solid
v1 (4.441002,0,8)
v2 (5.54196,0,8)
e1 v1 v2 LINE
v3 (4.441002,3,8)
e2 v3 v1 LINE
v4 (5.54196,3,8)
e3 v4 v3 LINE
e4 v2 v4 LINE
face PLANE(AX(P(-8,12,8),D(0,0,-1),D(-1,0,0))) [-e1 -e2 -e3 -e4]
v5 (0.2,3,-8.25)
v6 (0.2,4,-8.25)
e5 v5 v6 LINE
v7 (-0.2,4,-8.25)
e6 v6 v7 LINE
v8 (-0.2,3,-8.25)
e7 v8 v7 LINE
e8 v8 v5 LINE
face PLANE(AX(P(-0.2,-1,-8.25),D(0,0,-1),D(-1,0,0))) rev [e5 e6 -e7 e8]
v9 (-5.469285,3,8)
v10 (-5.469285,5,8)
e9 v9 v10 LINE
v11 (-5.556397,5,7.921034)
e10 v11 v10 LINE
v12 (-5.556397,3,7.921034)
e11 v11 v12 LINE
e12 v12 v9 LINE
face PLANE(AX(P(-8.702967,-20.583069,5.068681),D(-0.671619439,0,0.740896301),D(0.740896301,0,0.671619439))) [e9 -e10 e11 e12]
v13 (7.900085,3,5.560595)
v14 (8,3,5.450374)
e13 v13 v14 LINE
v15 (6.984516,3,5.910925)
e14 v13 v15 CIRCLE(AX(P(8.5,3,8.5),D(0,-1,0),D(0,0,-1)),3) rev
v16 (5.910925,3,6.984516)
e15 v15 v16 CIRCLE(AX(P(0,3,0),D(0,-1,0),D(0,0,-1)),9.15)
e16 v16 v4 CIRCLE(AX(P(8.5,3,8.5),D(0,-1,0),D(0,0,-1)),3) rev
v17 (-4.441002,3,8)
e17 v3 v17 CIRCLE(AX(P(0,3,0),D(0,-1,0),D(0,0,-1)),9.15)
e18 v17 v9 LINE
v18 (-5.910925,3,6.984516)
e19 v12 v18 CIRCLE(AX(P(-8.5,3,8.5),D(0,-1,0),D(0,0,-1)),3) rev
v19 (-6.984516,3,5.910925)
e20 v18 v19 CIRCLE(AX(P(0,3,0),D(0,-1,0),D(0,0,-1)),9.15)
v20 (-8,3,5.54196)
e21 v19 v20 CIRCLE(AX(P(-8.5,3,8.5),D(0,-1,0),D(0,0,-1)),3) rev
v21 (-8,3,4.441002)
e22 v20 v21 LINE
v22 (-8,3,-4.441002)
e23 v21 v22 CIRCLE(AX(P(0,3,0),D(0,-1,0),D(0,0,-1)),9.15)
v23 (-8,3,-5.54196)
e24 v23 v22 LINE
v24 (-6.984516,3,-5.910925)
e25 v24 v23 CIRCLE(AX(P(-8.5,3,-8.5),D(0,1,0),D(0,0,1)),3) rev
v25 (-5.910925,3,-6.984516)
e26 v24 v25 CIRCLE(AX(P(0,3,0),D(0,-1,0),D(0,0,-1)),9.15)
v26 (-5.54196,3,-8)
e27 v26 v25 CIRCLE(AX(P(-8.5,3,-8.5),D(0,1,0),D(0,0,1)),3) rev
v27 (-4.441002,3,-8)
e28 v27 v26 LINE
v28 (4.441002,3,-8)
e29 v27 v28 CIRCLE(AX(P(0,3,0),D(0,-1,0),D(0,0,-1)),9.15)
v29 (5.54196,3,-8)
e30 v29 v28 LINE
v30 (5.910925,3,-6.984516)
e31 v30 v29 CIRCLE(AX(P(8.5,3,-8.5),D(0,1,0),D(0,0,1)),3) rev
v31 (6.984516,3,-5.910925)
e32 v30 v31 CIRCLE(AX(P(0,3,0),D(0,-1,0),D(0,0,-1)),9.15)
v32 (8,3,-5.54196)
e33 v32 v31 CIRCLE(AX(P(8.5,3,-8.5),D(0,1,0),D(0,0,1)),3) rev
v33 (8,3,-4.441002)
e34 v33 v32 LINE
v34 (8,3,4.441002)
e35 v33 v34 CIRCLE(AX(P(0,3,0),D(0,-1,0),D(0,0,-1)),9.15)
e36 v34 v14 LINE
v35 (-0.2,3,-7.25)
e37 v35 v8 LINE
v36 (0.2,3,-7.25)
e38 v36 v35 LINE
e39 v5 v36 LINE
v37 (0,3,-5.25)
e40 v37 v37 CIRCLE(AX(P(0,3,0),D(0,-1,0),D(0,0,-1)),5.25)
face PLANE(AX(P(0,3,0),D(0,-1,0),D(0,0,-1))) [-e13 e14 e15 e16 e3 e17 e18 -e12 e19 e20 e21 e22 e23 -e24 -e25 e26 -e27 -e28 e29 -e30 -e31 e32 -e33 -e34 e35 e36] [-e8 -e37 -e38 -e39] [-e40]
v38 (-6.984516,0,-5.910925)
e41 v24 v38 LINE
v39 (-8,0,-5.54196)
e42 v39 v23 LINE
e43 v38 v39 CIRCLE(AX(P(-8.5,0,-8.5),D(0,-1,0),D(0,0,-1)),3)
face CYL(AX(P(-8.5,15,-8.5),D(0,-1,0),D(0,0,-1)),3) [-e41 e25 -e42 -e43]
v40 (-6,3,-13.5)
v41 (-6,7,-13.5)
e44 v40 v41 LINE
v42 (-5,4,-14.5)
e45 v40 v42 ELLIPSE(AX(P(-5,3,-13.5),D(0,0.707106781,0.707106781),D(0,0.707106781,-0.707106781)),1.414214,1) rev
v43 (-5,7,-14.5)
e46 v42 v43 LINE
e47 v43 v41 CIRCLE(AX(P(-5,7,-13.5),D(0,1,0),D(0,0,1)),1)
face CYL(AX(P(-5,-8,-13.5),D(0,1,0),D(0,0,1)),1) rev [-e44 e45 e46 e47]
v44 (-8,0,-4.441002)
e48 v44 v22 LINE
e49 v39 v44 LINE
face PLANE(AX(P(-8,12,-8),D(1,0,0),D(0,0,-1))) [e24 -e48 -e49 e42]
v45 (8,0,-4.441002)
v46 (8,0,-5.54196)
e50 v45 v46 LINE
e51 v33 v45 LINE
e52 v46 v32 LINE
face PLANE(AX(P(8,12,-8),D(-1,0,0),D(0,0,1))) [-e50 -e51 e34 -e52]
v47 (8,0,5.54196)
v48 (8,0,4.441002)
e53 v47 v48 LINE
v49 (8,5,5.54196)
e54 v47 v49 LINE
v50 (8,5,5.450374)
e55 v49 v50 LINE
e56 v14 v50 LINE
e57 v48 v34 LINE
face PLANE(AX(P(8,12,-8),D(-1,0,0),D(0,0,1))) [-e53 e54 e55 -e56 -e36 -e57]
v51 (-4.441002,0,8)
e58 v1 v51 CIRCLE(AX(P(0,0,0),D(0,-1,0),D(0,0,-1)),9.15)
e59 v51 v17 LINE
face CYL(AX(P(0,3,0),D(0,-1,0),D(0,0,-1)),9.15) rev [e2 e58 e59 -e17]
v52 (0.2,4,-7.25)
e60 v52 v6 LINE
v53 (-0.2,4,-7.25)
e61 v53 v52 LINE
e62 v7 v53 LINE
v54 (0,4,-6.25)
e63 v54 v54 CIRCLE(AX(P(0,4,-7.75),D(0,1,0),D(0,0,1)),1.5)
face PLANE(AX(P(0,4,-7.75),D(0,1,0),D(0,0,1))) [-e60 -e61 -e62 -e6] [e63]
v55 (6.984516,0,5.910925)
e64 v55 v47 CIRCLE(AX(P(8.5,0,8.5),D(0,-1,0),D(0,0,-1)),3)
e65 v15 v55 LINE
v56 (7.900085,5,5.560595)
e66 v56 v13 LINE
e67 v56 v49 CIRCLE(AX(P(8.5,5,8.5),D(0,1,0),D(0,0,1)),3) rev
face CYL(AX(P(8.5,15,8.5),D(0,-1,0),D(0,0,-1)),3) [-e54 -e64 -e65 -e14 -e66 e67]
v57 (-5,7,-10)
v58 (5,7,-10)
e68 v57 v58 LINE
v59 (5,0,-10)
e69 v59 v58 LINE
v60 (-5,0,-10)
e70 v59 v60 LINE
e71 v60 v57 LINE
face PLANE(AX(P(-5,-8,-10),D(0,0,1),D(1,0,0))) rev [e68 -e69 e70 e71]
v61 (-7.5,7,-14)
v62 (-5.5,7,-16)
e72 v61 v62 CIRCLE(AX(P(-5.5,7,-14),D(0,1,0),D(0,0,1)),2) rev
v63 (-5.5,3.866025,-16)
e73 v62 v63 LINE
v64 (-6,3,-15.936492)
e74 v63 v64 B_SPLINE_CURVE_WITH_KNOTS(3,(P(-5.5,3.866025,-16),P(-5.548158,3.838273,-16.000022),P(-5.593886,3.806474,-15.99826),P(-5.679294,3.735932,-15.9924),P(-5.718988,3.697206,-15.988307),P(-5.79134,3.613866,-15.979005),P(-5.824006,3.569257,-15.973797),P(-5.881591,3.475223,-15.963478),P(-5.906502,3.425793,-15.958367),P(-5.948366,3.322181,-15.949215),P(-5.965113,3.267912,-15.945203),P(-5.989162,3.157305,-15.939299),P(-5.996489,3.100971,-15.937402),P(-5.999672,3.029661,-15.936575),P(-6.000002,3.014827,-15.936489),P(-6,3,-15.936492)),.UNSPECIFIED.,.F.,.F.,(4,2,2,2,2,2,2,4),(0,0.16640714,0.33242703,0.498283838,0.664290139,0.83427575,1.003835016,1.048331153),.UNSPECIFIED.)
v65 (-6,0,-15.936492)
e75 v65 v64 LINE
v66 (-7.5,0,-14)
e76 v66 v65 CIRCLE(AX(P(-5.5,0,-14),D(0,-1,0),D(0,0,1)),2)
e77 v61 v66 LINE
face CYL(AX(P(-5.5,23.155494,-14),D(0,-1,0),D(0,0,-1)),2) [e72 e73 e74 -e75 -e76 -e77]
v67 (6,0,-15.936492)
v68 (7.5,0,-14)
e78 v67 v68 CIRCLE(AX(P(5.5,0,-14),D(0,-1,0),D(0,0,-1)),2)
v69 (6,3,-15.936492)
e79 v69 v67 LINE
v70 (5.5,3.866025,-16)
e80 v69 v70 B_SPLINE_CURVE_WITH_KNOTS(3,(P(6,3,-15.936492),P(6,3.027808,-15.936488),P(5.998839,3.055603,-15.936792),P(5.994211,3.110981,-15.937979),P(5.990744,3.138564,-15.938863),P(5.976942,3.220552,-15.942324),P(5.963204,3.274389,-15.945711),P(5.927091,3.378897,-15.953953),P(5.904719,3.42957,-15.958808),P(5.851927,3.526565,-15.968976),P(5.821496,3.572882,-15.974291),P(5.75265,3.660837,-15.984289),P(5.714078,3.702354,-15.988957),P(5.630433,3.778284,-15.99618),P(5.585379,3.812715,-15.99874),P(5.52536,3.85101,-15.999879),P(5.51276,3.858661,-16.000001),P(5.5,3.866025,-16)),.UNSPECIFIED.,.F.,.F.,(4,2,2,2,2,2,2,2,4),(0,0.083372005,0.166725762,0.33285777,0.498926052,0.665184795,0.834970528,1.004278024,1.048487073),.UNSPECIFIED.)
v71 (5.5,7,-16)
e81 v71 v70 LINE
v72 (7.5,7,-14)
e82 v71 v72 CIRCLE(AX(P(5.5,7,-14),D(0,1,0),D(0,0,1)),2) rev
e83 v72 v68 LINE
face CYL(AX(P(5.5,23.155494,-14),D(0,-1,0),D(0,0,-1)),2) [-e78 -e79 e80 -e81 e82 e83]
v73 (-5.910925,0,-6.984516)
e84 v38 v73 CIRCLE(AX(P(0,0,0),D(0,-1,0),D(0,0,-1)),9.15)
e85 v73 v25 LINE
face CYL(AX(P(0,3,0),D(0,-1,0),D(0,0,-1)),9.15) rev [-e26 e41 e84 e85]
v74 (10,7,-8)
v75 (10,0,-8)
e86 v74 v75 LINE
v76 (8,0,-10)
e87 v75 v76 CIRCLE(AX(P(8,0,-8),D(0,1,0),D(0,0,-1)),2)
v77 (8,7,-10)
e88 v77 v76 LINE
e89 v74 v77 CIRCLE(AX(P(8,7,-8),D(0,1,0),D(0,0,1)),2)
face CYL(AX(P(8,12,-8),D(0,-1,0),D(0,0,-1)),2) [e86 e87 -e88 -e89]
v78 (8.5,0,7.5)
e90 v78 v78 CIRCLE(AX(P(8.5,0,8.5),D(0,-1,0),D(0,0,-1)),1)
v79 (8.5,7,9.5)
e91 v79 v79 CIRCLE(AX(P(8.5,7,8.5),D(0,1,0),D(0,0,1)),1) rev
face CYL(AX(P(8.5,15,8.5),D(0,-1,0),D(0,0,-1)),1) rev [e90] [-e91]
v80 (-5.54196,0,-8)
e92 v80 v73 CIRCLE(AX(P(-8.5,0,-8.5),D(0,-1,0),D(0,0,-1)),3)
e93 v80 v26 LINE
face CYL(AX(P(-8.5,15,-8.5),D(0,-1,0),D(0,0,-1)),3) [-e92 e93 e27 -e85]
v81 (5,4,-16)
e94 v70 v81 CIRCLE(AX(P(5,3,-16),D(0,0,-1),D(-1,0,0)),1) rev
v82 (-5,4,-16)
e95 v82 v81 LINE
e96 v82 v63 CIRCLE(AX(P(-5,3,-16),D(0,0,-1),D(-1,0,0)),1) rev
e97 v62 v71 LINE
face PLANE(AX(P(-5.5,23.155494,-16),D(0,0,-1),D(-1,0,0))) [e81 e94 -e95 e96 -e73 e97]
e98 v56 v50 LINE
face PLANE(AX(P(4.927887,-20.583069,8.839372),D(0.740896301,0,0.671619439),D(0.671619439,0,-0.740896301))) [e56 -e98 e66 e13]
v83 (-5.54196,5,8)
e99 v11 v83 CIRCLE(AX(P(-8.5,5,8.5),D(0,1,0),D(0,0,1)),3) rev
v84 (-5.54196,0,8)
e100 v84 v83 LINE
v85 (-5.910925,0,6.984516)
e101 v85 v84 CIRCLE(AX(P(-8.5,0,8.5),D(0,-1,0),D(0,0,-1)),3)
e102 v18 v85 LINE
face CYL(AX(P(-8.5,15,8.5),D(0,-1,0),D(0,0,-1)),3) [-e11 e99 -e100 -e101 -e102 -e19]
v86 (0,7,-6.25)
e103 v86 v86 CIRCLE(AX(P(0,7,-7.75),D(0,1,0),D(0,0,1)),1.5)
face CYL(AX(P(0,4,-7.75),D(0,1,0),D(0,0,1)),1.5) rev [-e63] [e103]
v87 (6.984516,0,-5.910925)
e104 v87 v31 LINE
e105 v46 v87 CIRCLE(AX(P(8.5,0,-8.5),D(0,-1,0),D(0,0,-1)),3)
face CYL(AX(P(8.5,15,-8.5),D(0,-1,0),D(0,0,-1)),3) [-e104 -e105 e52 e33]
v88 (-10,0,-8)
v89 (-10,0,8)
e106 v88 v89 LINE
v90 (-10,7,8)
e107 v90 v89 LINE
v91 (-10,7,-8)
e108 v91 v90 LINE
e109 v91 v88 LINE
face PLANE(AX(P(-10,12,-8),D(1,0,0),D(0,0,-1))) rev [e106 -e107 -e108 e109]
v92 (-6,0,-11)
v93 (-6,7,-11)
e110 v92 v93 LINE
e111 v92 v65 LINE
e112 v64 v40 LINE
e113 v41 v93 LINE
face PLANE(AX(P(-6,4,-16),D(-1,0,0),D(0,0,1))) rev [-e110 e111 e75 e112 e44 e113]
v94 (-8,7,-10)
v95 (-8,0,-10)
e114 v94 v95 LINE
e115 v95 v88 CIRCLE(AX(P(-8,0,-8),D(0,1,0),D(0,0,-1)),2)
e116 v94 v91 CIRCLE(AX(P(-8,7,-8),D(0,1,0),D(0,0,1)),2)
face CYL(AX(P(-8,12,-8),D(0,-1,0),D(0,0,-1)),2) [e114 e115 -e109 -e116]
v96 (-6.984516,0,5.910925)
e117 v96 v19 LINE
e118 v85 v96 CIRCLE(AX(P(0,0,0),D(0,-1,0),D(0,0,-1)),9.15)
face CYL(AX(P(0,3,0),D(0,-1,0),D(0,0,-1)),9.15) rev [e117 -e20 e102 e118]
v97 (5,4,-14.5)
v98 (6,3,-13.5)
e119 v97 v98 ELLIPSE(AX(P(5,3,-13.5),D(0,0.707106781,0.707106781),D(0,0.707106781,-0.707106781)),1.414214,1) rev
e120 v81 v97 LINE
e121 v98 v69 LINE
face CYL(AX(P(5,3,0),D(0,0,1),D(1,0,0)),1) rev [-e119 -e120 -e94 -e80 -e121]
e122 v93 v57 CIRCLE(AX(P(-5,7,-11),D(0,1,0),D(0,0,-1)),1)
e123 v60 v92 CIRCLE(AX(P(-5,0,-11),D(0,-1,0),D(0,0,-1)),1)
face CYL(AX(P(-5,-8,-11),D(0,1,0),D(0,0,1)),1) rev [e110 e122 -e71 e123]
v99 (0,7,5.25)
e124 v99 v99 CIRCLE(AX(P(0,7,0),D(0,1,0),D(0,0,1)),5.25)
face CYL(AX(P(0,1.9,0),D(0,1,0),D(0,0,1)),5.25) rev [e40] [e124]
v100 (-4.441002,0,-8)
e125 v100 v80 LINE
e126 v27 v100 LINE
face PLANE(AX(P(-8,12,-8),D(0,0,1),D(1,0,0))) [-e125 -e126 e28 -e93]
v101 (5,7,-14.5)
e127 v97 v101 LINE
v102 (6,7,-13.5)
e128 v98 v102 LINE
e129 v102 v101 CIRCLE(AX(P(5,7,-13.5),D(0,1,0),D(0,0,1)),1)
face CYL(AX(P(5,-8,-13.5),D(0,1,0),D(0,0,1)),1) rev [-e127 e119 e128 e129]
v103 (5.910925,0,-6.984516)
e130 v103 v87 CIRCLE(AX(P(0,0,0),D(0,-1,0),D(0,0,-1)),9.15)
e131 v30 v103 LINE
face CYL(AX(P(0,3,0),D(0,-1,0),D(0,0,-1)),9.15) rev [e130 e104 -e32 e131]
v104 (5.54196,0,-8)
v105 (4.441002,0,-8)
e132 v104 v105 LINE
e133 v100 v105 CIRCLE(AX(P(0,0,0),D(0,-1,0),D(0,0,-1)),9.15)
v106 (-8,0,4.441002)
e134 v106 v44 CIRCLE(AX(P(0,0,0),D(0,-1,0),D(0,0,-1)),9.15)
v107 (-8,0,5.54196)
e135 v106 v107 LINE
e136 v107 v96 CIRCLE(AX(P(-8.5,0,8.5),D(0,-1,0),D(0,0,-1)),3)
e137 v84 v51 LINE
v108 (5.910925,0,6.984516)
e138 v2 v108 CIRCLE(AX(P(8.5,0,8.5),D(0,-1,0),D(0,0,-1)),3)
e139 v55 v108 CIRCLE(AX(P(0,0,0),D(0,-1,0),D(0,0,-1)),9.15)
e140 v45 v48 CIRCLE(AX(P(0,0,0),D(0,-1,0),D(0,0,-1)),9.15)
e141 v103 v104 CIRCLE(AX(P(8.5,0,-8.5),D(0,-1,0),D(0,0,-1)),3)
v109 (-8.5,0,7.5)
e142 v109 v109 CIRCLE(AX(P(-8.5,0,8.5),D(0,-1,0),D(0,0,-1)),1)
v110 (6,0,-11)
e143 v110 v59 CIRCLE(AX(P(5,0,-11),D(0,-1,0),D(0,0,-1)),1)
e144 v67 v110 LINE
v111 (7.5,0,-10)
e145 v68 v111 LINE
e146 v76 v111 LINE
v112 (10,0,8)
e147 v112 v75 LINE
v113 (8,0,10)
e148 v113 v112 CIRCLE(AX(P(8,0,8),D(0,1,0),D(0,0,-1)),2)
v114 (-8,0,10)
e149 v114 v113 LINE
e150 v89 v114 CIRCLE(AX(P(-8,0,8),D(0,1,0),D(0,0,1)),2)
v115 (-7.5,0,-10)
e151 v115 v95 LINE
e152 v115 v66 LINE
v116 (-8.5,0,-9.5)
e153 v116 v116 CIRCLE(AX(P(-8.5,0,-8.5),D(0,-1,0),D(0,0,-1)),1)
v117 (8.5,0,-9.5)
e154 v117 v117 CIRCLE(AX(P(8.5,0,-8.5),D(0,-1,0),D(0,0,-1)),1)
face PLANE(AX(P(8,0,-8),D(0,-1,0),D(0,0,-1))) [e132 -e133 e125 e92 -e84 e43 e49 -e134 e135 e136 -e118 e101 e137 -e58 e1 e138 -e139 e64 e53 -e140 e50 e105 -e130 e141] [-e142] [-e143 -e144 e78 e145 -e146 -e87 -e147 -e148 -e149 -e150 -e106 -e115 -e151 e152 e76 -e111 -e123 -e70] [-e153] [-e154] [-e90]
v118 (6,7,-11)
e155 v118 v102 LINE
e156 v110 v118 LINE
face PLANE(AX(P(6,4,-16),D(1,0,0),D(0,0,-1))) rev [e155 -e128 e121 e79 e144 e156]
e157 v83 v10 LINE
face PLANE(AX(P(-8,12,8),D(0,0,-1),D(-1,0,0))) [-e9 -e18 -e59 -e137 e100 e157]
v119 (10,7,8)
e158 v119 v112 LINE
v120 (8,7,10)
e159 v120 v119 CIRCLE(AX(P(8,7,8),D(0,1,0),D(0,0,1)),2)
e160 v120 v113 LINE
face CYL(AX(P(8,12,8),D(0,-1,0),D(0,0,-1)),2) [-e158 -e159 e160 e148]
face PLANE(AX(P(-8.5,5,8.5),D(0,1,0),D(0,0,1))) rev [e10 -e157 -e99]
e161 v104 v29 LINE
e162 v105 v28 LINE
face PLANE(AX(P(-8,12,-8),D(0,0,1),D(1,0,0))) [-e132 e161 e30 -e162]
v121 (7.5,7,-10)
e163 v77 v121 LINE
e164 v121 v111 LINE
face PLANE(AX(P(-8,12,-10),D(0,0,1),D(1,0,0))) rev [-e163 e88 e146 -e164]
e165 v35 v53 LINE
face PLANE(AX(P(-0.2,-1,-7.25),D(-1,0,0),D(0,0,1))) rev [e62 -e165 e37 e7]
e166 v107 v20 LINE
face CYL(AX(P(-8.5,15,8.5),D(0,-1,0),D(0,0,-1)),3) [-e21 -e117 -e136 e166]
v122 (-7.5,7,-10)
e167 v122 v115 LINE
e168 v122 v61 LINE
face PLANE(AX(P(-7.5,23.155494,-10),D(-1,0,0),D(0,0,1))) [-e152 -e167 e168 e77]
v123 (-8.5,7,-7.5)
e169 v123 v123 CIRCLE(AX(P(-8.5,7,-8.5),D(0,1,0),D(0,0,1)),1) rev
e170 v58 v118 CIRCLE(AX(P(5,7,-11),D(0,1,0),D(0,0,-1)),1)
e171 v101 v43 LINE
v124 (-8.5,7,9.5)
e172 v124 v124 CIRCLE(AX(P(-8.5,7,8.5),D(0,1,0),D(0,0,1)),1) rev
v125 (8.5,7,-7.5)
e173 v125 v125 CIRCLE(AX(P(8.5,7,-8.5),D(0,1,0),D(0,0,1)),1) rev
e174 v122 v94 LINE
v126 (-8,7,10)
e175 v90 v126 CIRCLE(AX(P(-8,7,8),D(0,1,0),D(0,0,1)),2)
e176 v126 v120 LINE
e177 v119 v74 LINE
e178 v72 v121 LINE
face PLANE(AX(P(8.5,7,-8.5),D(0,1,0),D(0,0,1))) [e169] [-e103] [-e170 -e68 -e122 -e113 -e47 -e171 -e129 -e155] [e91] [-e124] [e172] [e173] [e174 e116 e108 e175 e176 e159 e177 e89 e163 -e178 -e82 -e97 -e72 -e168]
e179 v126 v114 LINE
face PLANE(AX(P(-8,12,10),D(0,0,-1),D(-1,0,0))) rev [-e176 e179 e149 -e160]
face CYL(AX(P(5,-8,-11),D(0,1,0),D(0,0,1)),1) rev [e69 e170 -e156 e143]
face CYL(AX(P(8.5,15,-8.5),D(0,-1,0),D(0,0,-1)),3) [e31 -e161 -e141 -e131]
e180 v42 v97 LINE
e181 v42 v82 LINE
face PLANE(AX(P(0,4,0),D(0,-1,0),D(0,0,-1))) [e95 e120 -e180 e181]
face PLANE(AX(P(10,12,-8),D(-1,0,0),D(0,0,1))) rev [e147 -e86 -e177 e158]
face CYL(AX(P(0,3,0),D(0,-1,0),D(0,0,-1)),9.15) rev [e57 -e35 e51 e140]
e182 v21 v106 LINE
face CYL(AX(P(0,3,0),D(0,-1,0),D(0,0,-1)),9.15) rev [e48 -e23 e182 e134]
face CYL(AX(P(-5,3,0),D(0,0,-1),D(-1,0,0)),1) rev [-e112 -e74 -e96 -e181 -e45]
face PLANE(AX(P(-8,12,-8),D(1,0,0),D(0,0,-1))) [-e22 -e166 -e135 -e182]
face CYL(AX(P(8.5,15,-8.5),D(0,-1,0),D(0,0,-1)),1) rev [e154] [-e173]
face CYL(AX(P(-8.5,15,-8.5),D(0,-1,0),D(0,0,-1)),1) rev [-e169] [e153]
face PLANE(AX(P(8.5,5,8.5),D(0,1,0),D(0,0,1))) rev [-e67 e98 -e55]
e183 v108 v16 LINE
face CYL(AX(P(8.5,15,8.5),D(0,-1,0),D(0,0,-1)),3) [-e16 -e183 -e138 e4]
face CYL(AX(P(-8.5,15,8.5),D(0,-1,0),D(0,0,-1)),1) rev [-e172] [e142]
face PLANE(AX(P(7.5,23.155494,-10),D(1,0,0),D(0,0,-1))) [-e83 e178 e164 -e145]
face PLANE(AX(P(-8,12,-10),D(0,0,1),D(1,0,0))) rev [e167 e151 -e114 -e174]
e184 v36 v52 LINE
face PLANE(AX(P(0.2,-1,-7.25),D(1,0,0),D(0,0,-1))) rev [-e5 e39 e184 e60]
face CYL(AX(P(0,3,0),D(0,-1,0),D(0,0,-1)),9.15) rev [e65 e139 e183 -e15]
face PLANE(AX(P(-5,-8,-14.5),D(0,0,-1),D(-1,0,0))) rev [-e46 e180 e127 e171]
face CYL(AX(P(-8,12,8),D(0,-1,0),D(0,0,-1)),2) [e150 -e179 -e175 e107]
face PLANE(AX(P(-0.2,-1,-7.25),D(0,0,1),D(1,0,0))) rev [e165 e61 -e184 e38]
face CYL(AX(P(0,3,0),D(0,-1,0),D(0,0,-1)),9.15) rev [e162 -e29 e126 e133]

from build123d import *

# Parameters (mm, degrees)
BOSS_EXTRUDE1_DEPTH = 12
SKETCH2_R           = 1
CUT_EXTRUDE1_DEPTH  = 15
SKETCH4_R           = 2.25
CUT_EXTRUDE3_DEPTH  = 5
SHELL1_DEPTH        = 10
SHELL1_2_DEPTH      = 5
SKETCH3_R           = 9.15
CUT_EXTRUDE2_DEPTH  = 3
FILLET1_R           = 2
BOSS_EXTRUDE2_DEPTH = 7
SKETCH7_W           = 12
SKETCH7_H           = 4.549017994
CUT_EXTRUDE4_DEPTH  = 4
SKETCH8_W           = 27.297760414
SKETCH8_H           = 10.352522689
CUT_EXTRUDE5_DEPTH  = 33
BOSS_EXTRUDE8_DEPTH = 4
SKETCH11_R          = 5.5
CUT_EXTRUDE6_DEPTH  = 4
SKETCH12_R          = 1.5
CUT_EXTRUDE7_DEPTH  = 3
SKETCH13_W          = 0.4
SKETCH13_H          = 1
CUT_EXTRUDE8_DEPTH  = 5
CUT_EXTRUDE9_DEPTH  = 15
FILLET2_R           = 1
BOSS_EXTRUDE9_DEPTH = 4
SKETCH16_R          = 5.25
CUT_EXTRUDE10_DEPTH = 5.1


# Read off the part's stored shape, not the designer's step: Shell1
with BuildPart() as part:
    # Sketch1 → Boss-Extrude1 (new body)
    with BuildSketch(Plane(origin=(0, 0, 0), x_dir=(1, 0, 0), z_dir=(0, 1, 0))):
        with BuildLine():
            Line((-8, 10), (8, 10))
            ThreePointArc((8, 10), (9.414213562, 9.414213562), (10, 8))
            Line((10, 8), (10, -8))
            ThreePointArc((10, -8), (9.414213562, -9.414213562), (8, -10))
            Line((8, -10), (-8, -10))
            ThreePointArc((-8, -10), (-9.414213562, -9.414213562), (-10, -8))
            Line((-10, -8), (-10, 8))
            ThreePointArc((-10, 8), (-9.414213562, 9.414213562), (-8, 10))
        make_face()
    extrude(amount=BOSS_EXTRUDE1_DEPTH)

    # Sketch2 → Cut-Extrude1 (cut)
    with BuildSketch(Plane.XZ):
        with Locations(Location((-8.5, 8.5, 0), (0, 0, 270))):
            Circle(SKETCH2_R)
        with Locations(Location((8.5, 8.5, 0), (0, 0, 270))):
            Circle(SKETCH2_R)
        with Locations(Location((8.5, -8.5, 0), (0, 0, 270))):
            Circle(SKETCH2_R)
        with Locations(Location((-8.5, -8.5, 0), (0, 0, 270))):
            Circle(SKETCH2_R)
    extrude(amount=-CUT_EXTRUDE1_DEPTH, mode=Mode.SUBTRACT)

    # Sketch4 → Cut-Extrude3 (cut)
    with BuildSketch(Plane(origin=(0, 12, 0), x_dir=(1, 0, 0), z_dir=(0, 1, 0))):
        with Locations((8.5, -8.5)):
            Circle(SKETCH4_R)
        with Locations((-8.5, -8.5)):
            Circle(SKETCH4_R)
        with Locations((-8.5, 8.5)):
            Circle(SKETCH4_R)
        with Locations((8.5, 8.5)):
            Circle(SKETCH4_R)
    extrude(amount=-CUT_EXTRUDE3_DEPTH, mode=Mode.SUBTRACT)

    # Shell1 outline → Shell1 (cut)
    with BuildSketch(Plane(origin=(0, 0, 0), x_dir=(1, 0, 0), z_dir=(0, 1, 0))):
        with BuildLine():
            Line((-4.279514246, -8), (4.279514246, -8))
            ThreePointArc((4.279514246, -8), (5.49479618, -5.49479618), (8, -4.279514246))
            Line((8, -4.279514246), (8, 4.279514246))
            ThreePointArc((8, 4.279514246), (5.49479618, 5.49479618), (4.279514246, 8))
            Line((4.279514246, 8), (-4.279514246, 8))
            ThreePointArc((-4.279514246, 8), (-5.49479618, 5.49479618), (-8, 4.279514246))
            Line((-8, 4.279514246), (-8, -4.279514246))
            ThreePointArc((-8, -4.279514246), (-5.49479618, -5.49479618), (-4.279514246, -8))
        make_face()
    extrude(amount=SHELL1_DEPTH, mode=Mode.SUBTRACT)

    # Shell1 2 outline → Shell1 2 (cut)
    with BuildSketch(Plane(origin=(0, 0, 0), x_dir=(1, 0, 0), z_dir=(0, 1, 0))):
        with BuildLine():
            Line((4.279514246, -8), (5.541960108, -8))
            ThreePointArc((5.541960108, -8), (6.378679656, -6.378679656), (8, -5.541960108))
            Line((8, -5.541960108), (8, -4.279514246))
            ThreePointArc((8, -4.279514246), (5.49479618, -5.49479618), (4.279514246, -8))
        make_face()
        with BuildLine():
            Line((-5.541960108, -8), (-4.279514246, -8))
            ThreePointArc((-4.279514246, -8), (-5.49479618, -5.49479618), (-8, -4.279514246))
            Line((-8, -4.279514246), (-8, -5.541960108))
            ThreePointArc((-8, -5.541960108), (-6.378679656, -6.378679656), (-5.541960108, -8))
        make_face()
        with BuildLine():
            ThreePointArc((4.279514246, 8), (5.49479618, 5.49479618), (8, 4.279514246))
            Line((8, 4.279514246), (8, 5.541960108))
            ThreePointArc((8, 5.541960108), (6.378679656, 6.378679656), (5.541960108, 8))
            Line((5.541960108, 8), (4.279514246, 8))
        make_face()
        with BuildLine():
            Line((-8, 5.541960108), (-8, 4.279514246))
            ThreePointArc((-8, 4.279514246), (-5.49479618, 5.49479618), (-4.279514246, 8))
            Line((-4.279514246, 8), (-5.541960108, 8))
            ThreePointArc((-5.541960108, 8), (-6.378679656, 6.378679656), (-8, 5.541960108))
        make_face()
    extrude(amount=SHELL1_2_DEPTH, mode=Mode.SUBTRACT)

    # Sketch3 → Cut-Extrude2 (cut)
    with BuildSketch(Plane.XZ):
        Circle(SKETCH3_R)
    extrude(amount=-CUT_EXTRUDE2_DEPTH, mode=Mode.SUBTRACT)

    # Fillet1
    fillet1_edges = [part.edges().sort_by_distance(p)[0] for p in [
        (6.822949017, 9.5, -10),
        (10, 9.5, -6.822949017),
        (-6.822949017, 9.5, -10),
        (-10, 9.5, -6.822949017),
        (-10, 9.5, 6.822949017),
        (-6.822949017, 9.5, 10),
        (6.822949017, 9.5, 10),
        (10, 9.5, 6.822949017),
    ]]
    fillet(fillet1_edges, radius=FILLET1_R)

    # Sketch6 → Boss-Extrude2 (add)
    with BuildSketch(Plane.XZ):
        with BuildLine():
            Line((-7.5, -10), (7.5, -10))
            Line((7.5, -10), (7.5, -14))
            ThreePointArc((7.5, -14), (6.914213562, -15.414213562), (5.5, -16))
            Line((5.5, -16), (-5.5, -16))
            ThreePointArc((-5.5, -16), (-6.914213562, -15.414213562), (-7.5, -14))
            Line((-7.5, -14), (-7.5, -10))
        make_face()
    extrude(amount=-BOSS_EXTRUDE2_DEPTH)

    # Sketch7 → Cut-Extrude4 (cut)
    with BuildSketch(Plane.XZ):
        with Locations((0, -13.725491003)):
            Rectangle(SKETCH7_W, SKETCH7_H)
    extrude(amount=-CUT_EXTRUDE4_DEPTH, mode=Mode.SUBTRACT)

    # Sketch8 → Cut-Extrude5 (cut)
    with BuildSketch(Plane(origin=(10, 0, 0), x_dir=(0, 0, -1), z_dir=(1, 0, 0))):
        with Locations((3.648880207, 12.176261345)):
            Rectangle(SKETCH8_W, SKETCH8_H)
    extrude(amount=-CUT_EXTRUDE5_DEPTH, mode=Mode.SUBTRACT)

    # Sketch10 → Boss-Extrude8 (add)
    with BuildSketch(Plane(origin=(0, 7, 0), x_dir=(1, 0, 0), z_dir=(0, 1, 0))):
        Polygon((9.294915126, 4.441002139), (-9.072540785, 4.441002139), (-5.843708737, 9.485613806), (6.066083078, 9.485613806), align=None)
    extrude(amount=-BOSS_EXTRUDE8_DEPTH)

    # Sketch11 → Cut-Extrude6 (cut)
    with BuildSketch(Plane.XZ.offset(-3)):
        Circle(SKETCH11_R)
    extrude(amount=-CUT_EXTRUDE6_DEPTH, mode=Mode.SUBTRACT)

    # Sketch12 → Cut-Extrude7 (cut)
    with BuildSketch(Plane(origin=(0, 7, 0), x_dir=(1, 0, 0), z_dir=(0, 1, 0))):
        with Locations(Location((0, 7.75, 0), (0, 0, 270))):
            Circle(SKETCH12_R)
    extrude(amount=-CUT_EXTRUDE7_DEPTH, mode=Mode.SUBTRACT)

    # Sketch13 → Cut-Extrude8 (cut)
    with BuildSketch(Plane(origin=(0, 4, 0), x_dir=(1, 0, 0), z_dir=(0, 1, 0))):
        with Locations((0, 7.75)):
            Rectangle(SKETCH13_W, SKETCH13_H)
    extrude(amount=-CUT_EXTRUDE8_DEPTH, mode=Mode.SUBTRACT)

    # Sketch14 → Cut-Extrude9 (cut)
    with BuildSketch(Plane(origin=(0, 7, 0), x_dir=(1, 0, 0), z_dir=(0, 1, 0))):
        with BuildLine():
            Line((-5, 14.5), (5, 14.5))
            ThreePointArc((5, 14.5), (5.707106781, 14.207106781), (6, 13.5))
            Line((6, 13.5), (6, 11))
            ThreePointArc((6, 11), (5.707106781, 10.292893219), (5, 10))
            Line((5, 10), (-5, 10))
            ThreePointArc((-5, 10), (-5.707106781, 10.292893219), (-6, 11))
            Line((-6, 11), (-6, 13.5))
            ThreePointArc((-6, 13.5), (-5.707106781, 14.207106781), (-5, 14.5))
        make_face()
    extrude(amount=-CUT_EXTRUDE9_DEPTH, mode=Mode.SUBTRACT)

    # Fillet2
    fillet2_edges = [part.edges().sort_by_distance(p)[0] for p in [
        (-6, 4, -14.718245837),
        (6, 4, -14.718245837),
    ]]
    fillet(fillet2_edges, radius=FILLET2_R)

    # Sketch15 → Boss-Extrude9 (add)
    with BuildSketch(Plane(origin=(0, 7, 0), x_dir=(1, 0, 0), z_dir=(0, 1, 0))):
        Polygon((4.927887467, -8.83937155), (8.987059624, -4.361499915), (8.535312268, 4.849371277), (4.119785389, 6.639048991), (-3.498767695, 5.109974325), (-8.089855619, 5.874511658), (-8.702967098, -5.068680896), (-4.41401834, -8.956595244), align=None)
    extrude(amount=-BOSS_EXTRUDE9_DEPTH)

    # Sketch16 → Cut-Extrude10 (cut)
    with BuildSketch(Plane(origin=(0, 7, 0), x_dir=(1, 0, 0), z_dir=(0, 1, 0))):
        with Locations(Location((0, 0, 0), (0, 0, 270))):
            Circle(SKETCH16_R)
    extrude(amount=-CUT_EXTRUDE10_DEPTH, mode=Mode.SUBTRACT)


solid = part.part
